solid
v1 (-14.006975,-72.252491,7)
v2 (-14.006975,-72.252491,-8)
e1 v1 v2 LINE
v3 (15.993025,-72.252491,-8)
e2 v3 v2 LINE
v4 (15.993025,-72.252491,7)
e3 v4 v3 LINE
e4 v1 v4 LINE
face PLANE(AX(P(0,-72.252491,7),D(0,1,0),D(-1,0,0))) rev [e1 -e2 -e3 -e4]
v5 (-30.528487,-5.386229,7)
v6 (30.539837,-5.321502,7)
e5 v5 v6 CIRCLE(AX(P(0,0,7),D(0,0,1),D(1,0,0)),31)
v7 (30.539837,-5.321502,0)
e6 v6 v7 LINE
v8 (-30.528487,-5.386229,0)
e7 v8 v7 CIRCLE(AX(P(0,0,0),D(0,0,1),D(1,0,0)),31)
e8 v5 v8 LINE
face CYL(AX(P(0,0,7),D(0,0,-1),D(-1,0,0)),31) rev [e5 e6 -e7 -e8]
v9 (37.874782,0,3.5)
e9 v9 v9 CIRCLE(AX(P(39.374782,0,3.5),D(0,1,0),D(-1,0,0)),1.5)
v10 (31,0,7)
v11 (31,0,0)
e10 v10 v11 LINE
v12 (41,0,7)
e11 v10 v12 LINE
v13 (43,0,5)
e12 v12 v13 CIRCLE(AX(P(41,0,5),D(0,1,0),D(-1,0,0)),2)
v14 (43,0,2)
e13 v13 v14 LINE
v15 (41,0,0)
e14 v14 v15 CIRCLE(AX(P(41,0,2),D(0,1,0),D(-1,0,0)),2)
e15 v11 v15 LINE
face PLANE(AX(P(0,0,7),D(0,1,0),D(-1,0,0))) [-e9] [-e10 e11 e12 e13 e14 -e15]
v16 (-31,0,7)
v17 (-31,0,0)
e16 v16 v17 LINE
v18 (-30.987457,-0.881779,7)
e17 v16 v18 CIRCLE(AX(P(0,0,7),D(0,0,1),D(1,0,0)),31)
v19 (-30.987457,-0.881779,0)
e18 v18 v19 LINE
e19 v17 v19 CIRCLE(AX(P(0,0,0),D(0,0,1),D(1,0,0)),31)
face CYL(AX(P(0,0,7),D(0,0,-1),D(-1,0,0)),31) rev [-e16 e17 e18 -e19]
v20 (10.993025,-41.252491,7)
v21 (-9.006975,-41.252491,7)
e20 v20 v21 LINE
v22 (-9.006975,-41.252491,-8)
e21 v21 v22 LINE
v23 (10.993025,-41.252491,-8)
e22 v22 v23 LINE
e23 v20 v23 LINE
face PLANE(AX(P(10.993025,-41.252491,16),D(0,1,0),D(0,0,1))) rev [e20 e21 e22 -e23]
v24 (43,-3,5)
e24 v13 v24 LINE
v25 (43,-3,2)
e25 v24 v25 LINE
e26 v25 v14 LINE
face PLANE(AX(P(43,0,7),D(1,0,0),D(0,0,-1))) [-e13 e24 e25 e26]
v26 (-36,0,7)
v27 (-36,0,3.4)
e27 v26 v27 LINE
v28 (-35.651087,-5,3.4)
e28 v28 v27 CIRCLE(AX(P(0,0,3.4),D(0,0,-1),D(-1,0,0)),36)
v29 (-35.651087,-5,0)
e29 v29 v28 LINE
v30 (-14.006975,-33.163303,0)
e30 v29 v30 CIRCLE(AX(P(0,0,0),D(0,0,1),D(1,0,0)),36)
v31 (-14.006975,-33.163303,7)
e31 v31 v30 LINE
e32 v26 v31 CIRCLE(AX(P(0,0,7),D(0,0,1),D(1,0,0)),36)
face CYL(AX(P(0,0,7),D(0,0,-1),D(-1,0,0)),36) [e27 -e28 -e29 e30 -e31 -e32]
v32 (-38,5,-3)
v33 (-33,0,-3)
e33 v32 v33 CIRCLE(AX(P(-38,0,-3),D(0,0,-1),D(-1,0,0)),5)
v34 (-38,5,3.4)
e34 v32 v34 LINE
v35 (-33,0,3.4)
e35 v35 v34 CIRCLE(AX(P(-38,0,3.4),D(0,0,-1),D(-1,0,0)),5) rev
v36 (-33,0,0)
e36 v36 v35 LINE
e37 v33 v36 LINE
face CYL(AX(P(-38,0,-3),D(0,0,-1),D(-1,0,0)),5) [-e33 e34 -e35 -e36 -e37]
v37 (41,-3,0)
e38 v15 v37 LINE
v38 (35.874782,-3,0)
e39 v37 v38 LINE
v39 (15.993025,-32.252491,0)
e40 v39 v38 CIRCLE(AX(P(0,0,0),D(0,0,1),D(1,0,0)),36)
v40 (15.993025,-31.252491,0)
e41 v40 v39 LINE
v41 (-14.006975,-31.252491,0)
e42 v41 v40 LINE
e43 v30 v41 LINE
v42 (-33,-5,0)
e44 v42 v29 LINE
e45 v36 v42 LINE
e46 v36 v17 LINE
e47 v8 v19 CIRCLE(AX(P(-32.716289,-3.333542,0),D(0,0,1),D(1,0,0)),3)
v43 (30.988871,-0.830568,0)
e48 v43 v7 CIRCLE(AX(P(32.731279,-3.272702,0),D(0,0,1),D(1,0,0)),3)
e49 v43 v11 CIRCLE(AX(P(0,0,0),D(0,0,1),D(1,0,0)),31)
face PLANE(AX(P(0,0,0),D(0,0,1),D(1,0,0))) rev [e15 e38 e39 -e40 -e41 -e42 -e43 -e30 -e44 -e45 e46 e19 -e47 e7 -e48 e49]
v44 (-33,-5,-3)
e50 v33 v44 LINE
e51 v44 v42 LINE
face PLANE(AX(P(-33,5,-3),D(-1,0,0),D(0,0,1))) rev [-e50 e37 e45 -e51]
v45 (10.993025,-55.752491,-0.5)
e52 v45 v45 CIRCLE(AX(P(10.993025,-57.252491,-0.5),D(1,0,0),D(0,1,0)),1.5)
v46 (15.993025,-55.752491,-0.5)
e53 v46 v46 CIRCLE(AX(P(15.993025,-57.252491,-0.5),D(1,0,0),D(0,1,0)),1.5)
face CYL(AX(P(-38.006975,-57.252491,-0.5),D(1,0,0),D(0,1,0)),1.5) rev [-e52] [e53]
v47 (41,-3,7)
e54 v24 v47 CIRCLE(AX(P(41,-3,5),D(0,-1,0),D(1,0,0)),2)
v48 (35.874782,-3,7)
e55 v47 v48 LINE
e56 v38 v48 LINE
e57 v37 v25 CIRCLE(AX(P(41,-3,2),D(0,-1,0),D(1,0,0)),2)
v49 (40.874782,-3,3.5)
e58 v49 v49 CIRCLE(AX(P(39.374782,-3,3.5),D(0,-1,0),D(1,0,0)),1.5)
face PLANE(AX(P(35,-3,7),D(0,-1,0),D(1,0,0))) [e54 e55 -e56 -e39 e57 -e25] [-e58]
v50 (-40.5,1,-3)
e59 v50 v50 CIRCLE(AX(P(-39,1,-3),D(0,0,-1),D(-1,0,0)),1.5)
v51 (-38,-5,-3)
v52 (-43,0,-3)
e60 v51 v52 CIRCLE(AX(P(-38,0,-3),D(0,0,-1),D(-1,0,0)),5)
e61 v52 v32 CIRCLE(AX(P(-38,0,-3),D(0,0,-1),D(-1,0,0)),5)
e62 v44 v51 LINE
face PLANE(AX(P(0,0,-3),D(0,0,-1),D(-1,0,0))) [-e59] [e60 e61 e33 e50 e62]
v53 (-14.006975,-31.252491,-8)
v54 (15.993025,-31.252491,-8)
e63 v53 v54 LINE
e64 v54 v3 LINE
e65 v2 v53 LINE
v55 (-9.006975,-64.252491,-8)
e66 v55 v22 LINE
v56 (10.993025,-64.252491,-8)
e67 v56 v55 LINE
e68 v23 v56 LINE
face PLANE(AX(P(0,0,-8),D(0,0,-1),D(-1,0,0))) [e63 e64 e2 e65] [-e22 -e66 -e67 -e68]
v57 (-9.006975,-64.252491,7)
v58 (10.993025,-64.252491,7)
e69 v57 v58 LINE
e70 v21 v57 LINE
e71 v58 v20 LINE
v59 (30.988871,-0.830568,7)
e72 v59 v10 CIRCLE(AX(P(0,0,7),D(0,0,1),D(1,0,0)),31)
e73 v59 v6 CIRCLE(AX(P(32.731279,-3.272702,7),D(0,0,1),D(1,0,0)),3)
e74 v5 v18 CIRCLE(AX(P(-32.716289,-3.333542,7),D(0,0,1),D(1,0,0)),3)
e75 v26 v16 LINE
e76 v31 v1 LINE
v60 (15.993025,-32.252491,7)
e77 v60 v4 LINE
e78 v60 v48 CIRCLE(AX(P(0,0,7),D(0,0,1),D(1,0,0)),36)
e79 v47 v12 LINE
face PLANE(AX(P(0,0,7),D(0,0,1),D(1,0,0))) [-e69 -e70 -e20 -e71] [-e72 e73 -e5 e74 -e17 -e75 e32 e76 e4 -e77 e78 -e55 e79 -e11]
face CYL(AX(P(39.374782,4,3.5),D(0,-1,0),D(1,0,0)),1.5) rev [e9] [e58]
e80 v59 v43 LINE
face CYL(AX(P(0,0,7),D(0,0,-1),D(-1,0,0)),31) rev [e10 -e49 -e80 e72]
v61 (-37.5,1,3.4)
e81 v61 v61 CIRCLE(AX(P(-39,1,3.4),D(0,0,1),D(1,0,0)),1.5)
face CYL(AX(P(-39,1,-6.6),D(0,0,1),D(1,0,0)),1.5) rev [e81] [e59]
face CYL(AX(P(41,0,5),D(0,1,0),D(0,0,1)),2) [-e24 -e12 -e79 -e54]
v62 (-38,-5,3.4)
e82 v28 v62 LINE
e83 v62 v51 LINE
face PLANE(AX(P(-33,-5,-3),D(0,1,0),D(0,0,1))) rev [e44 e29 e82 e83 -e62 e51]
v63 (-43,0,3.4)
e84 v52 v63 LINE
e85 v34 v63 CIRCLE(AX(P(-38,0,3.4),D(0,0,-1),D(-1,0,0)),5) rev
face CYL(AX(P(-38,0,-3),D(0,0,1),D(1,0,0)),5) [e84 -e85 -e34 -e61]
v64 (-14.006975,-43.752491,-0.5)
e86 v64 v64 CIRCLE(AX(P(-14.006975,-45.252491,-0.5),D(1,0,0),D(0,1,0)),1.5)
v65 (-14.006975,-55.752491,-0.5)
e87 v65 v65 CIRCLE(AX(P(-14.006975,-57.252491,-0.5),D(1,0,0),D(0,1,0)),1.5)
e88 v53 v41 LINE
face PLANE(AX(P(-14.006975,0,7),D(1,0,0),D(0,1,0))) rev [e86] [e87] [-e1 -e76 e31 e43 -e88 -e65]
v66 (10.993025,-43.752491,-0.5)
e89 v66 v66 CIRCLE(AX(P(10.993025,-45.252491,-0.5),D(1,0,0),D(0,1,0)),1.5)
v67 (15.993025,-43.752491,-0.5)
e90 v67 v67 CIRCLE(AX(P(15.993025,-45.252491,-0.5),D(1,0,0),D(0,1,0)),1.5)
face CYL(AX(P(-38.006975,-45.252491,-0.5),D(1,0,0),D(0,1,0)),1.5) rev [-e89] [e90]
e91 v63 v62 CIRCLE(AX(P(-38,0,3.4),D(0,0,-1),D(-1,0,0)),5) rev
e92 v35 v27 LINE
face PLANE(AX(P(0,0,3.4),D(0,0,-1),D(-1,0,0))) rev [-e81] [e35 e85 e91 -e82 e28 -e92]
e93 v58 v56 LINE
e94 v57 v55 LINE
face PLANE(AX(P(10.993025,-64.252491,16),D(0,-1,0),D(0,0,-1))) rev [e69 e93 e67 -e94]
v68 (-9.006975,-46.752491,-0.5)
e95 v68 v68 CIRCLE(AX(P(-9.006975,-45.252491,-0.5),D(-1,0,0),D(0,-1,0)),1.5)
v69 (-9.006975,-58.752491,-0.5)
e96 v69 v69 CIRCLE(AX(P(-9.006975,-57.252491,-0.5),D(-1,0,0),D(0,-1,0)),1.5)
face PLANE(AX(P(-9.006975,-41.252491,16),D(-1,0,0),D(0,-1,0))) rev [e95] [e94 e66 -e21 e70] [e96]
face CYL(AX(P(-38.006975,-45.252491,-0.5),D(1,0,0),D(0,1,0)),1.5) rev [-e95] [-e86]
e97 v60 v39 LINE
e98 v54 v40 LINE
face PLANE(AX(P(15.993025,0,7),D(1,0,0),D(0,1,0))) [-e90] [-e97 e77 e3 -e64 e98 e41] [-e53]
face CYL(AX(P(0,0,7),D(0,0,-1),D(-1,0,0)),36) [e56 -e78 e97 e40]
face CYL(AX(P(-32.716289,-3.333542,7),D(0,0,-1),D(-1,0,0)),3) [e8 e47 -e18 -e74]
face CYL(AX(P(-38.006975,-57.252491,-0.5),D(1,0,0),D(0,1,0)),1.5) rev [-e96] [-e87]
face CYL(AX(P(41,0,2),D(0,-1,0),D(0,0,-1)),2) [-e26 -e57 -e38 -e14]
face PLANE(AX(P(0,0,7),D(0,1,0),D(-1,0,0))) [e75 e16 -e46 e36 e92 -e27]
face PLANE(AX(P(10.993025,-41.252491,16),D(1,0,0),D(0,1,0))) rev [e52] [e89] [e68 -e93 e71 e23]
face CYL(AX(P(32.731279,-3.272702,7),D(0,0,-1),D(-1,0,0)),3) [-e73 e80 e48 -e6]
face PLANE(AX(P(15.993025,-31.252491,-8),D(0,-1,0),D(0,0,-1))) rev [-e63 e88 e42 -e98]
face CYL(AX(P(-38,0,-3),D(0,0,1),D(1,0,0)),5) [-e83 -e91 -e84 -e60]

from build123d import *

# Parameters (mm, degrees)
BOSS_EXTRUDE2_DEPTH      = 7
BOSS_EXTRUDE4_DEPTH      = 3
BOSS_EXTRUDE4_DEPTH_BACK = 3.4
SKETCH2_W                = 10
SKETCH2_H                = 10
SKETCH3_R                = 1.5
CUT_EXTRUDE1_DEPTH       = 10
SKETCH4_W                = 8
SKETCH4_H                = 3
BOSS_EXTRUDE5_DEPTH      = 7
SKETCH5_R                = 1.5
CUT_EXTRUDE2_DEPTH       = 7
FILLET1_R                = 5
FILLET2_R                = 5
FILLET3_R                = 5
FILLET4_R                = 2
FILLET5_R                = 2
SKETCH6_W                = 30
SKETCH6_H                = 41
BOSS_EXTRUDE6_DEPTH      = 8
SKETCH7_W                = 20
SKETCH7_H                = 23
CUT_EXTRUDE3_DEPTH       = 24
SKETCH8_R                = 1.5
CUT_EXTRUDE5_DEPTH       = 54


with BuildPart() as part:
    # Sketch1 → Boss-Extrude2 (new body)
    with BuildSketch(Plane.XY):
        with BuildLine():
            Line((36, 0), (31, 0))
            ThreePointArc((31, 0), (30.997217748, -0.415321451), (30.98887149, -0.830568352))
            ThreePointArc((30.98887149, -0.830568352), (29.746163614, -2.974229152), (30.539836631, -5.321501534))
            ThreePointArc((30.539836631, -5.321501534), (0.032857513, -30.999982587), (-30.528487289, -5.386229095))
            ThreePointArc((-30.528487289, -5.386229095), (-29.731741507, -3.029439038), (-30.987456583, -0.881779181))
            ThreePointArc((-30.987456583, -0.881779181), (-30.996863987, -0.440934196), (-31, 0))
            Line((-31, 0), (-36, 0))
            ThreePointArc((-36, 0), (-30.002092566, -19.89659372), (-14.006975463, -33.163302586))
            Line((-14.006975463, -33.163302586), (-14.006975463, -72.252490852))
            Line((-14.006975463, -72.252490852), (15.993024537, -72.252490852))
            Line((15.993024537, -72.252490852), (15.993024537, -32.252490852))
            ThreePointArc((15.993024537, -32.252490852), (30.592065012, -18.976974425), (36, 0))
        make_face()
    extrude(amount=BOSS_EXTRUDE2_DEPTH)

    # Sketch2 → Boss-Extrude4 (add, two sides: drawn at the far end of the back side and taken through both)
    with BuildSketch(Plane(origin=(0, 0, 0), x_dir=(-1, 0, 0), z_dir=(0, 0, -1)).offset(-BOSS_EXTRUDE4_DEPTH_BACK)):
        with Locations((38, 0)):
            Rectangle(SKETCH2_W, SKETCH2_H)
    extrude(amount=BOSS_EXTRUDE4_DEPTH + BOSS_EXTRUDE4_DEPTH_BACK)

    # Sketch3 → Cut-Extrude1 (cut)
    with BuildSketch(Plane.XY.offset(3.4)):
        with Locations((-39, 1)):
            Circle(SKETCH3_R)
    extrude(amount=-CUT_EXTRUDE1_DEPTH, mode=Mode.SUBTRACT)

    # Sketch4 → Boss-Extrude5 (add)
    with BuildSketch(Plane(origin=(0, 0, 0), x_dir=(-1, 0, 0), z_dir=(0, 0, -1))):
        with Locations((-39, -1.5)):
            Rectangle(SKETCH4_W, SKETCH4_H)
    extrude(amount=-BOSS_EXTRUDE5_DEPTH)

    # Sketch5 → Cut-Extrude2 (cut)
    with BuildSketch(Plane.XZ.offset(3)):
        with Locations((39.374782229, 3.5)):
            Circle(SKETCH5_R)
    extrude(amount=-CUT_EXTRUDE2_DEPTH, mode=Mode.SUBTRACT)

    # Fillet1
    fillet1_edges = [part.edges().sort_by_distance(p)[0] for p in [
        (-43, -5, 0.2),
    ]]
    fillet(fillet1_edges, radius=FILLET1_R)

    # Fillet2
    fillet2_edges = [part.edges().sort_by_distance(p)[0] for p in [
        (-43, 5, 0.2),
    ]]
    fillet(fillet2_edges, radius=FILLET2_R - 0.0001)  # a hair under: the kernel refuses the full size

    # Fillet3
    fillet3_edges = [part.edges().sort_by_distance(p)[0] for p in [
        (-33, 5, 0.2),
    ]]
    fillet(fillet3_edges, radius=FILLET3_R)

    # Fillet4
    fillet4_edges = [part.edges().sort_by_distance(p)[0] for p in [
        (43, -1.5, 0),
    ]]
    fillet(fillet4_edges, radius=FILLET4_R)

    # Fillet5
    fillet5_edges = [part.edges().sort_by_distance(p)[0] for p in [
        (43, -1.5, 7),
    ]]
    fillet(fillet5_edges, radius=FILLET5_R)

    # Sketch6 → Boss-Extrude6 (add)
    with BuildSketch(Plane(origin=(0, 0, 0), x_dir=(-1, 0, 0), z_dir=(0, 0, -1))):
        with Locations((-0.993024537, -51.752490852)):
            Rectangle(SKETCH6_W, SKETCH6_H)
    extrude(amount=BOSS_EXTRUDE6_DEPTH)

    # Sketch7 → Cut-Extrude3 (cut)
    with BuildSketch(Plane(origin=(0, 0, -8), x_dir=(-1, 0, 0), z_dir=(0, 0, -1))):
        with Locations((-0.993024537, -52.752490852)):
            Rectangle(SKETCH7_W, SKETCH7_H)
    extrude(amount=-CUT_EXTRUDE3_DEPTH, mode=Mode.SUBTRACT)

    # Sketch8 → Cut-Extrude5 (cut)
    with BuildSketch(Plane(origin=(15.993024537, 0, 0), x_dir=(0, 0, -1), z_dir=(1, 0, 0))):
        with Locations(Location((0.5, -45.252490852, 0), (0, 0, 90))):
            Circle(SKETCH8_R)
        with Locations(Location((0.5, -57.252490852, 0), (0, 0, 90))):
            Circle(SKETCH8_R)
    extrude(amount=-CUT_EXTRUDE5_DEPTH, mode=Mode.SUBTRACT)


solid = part.part
